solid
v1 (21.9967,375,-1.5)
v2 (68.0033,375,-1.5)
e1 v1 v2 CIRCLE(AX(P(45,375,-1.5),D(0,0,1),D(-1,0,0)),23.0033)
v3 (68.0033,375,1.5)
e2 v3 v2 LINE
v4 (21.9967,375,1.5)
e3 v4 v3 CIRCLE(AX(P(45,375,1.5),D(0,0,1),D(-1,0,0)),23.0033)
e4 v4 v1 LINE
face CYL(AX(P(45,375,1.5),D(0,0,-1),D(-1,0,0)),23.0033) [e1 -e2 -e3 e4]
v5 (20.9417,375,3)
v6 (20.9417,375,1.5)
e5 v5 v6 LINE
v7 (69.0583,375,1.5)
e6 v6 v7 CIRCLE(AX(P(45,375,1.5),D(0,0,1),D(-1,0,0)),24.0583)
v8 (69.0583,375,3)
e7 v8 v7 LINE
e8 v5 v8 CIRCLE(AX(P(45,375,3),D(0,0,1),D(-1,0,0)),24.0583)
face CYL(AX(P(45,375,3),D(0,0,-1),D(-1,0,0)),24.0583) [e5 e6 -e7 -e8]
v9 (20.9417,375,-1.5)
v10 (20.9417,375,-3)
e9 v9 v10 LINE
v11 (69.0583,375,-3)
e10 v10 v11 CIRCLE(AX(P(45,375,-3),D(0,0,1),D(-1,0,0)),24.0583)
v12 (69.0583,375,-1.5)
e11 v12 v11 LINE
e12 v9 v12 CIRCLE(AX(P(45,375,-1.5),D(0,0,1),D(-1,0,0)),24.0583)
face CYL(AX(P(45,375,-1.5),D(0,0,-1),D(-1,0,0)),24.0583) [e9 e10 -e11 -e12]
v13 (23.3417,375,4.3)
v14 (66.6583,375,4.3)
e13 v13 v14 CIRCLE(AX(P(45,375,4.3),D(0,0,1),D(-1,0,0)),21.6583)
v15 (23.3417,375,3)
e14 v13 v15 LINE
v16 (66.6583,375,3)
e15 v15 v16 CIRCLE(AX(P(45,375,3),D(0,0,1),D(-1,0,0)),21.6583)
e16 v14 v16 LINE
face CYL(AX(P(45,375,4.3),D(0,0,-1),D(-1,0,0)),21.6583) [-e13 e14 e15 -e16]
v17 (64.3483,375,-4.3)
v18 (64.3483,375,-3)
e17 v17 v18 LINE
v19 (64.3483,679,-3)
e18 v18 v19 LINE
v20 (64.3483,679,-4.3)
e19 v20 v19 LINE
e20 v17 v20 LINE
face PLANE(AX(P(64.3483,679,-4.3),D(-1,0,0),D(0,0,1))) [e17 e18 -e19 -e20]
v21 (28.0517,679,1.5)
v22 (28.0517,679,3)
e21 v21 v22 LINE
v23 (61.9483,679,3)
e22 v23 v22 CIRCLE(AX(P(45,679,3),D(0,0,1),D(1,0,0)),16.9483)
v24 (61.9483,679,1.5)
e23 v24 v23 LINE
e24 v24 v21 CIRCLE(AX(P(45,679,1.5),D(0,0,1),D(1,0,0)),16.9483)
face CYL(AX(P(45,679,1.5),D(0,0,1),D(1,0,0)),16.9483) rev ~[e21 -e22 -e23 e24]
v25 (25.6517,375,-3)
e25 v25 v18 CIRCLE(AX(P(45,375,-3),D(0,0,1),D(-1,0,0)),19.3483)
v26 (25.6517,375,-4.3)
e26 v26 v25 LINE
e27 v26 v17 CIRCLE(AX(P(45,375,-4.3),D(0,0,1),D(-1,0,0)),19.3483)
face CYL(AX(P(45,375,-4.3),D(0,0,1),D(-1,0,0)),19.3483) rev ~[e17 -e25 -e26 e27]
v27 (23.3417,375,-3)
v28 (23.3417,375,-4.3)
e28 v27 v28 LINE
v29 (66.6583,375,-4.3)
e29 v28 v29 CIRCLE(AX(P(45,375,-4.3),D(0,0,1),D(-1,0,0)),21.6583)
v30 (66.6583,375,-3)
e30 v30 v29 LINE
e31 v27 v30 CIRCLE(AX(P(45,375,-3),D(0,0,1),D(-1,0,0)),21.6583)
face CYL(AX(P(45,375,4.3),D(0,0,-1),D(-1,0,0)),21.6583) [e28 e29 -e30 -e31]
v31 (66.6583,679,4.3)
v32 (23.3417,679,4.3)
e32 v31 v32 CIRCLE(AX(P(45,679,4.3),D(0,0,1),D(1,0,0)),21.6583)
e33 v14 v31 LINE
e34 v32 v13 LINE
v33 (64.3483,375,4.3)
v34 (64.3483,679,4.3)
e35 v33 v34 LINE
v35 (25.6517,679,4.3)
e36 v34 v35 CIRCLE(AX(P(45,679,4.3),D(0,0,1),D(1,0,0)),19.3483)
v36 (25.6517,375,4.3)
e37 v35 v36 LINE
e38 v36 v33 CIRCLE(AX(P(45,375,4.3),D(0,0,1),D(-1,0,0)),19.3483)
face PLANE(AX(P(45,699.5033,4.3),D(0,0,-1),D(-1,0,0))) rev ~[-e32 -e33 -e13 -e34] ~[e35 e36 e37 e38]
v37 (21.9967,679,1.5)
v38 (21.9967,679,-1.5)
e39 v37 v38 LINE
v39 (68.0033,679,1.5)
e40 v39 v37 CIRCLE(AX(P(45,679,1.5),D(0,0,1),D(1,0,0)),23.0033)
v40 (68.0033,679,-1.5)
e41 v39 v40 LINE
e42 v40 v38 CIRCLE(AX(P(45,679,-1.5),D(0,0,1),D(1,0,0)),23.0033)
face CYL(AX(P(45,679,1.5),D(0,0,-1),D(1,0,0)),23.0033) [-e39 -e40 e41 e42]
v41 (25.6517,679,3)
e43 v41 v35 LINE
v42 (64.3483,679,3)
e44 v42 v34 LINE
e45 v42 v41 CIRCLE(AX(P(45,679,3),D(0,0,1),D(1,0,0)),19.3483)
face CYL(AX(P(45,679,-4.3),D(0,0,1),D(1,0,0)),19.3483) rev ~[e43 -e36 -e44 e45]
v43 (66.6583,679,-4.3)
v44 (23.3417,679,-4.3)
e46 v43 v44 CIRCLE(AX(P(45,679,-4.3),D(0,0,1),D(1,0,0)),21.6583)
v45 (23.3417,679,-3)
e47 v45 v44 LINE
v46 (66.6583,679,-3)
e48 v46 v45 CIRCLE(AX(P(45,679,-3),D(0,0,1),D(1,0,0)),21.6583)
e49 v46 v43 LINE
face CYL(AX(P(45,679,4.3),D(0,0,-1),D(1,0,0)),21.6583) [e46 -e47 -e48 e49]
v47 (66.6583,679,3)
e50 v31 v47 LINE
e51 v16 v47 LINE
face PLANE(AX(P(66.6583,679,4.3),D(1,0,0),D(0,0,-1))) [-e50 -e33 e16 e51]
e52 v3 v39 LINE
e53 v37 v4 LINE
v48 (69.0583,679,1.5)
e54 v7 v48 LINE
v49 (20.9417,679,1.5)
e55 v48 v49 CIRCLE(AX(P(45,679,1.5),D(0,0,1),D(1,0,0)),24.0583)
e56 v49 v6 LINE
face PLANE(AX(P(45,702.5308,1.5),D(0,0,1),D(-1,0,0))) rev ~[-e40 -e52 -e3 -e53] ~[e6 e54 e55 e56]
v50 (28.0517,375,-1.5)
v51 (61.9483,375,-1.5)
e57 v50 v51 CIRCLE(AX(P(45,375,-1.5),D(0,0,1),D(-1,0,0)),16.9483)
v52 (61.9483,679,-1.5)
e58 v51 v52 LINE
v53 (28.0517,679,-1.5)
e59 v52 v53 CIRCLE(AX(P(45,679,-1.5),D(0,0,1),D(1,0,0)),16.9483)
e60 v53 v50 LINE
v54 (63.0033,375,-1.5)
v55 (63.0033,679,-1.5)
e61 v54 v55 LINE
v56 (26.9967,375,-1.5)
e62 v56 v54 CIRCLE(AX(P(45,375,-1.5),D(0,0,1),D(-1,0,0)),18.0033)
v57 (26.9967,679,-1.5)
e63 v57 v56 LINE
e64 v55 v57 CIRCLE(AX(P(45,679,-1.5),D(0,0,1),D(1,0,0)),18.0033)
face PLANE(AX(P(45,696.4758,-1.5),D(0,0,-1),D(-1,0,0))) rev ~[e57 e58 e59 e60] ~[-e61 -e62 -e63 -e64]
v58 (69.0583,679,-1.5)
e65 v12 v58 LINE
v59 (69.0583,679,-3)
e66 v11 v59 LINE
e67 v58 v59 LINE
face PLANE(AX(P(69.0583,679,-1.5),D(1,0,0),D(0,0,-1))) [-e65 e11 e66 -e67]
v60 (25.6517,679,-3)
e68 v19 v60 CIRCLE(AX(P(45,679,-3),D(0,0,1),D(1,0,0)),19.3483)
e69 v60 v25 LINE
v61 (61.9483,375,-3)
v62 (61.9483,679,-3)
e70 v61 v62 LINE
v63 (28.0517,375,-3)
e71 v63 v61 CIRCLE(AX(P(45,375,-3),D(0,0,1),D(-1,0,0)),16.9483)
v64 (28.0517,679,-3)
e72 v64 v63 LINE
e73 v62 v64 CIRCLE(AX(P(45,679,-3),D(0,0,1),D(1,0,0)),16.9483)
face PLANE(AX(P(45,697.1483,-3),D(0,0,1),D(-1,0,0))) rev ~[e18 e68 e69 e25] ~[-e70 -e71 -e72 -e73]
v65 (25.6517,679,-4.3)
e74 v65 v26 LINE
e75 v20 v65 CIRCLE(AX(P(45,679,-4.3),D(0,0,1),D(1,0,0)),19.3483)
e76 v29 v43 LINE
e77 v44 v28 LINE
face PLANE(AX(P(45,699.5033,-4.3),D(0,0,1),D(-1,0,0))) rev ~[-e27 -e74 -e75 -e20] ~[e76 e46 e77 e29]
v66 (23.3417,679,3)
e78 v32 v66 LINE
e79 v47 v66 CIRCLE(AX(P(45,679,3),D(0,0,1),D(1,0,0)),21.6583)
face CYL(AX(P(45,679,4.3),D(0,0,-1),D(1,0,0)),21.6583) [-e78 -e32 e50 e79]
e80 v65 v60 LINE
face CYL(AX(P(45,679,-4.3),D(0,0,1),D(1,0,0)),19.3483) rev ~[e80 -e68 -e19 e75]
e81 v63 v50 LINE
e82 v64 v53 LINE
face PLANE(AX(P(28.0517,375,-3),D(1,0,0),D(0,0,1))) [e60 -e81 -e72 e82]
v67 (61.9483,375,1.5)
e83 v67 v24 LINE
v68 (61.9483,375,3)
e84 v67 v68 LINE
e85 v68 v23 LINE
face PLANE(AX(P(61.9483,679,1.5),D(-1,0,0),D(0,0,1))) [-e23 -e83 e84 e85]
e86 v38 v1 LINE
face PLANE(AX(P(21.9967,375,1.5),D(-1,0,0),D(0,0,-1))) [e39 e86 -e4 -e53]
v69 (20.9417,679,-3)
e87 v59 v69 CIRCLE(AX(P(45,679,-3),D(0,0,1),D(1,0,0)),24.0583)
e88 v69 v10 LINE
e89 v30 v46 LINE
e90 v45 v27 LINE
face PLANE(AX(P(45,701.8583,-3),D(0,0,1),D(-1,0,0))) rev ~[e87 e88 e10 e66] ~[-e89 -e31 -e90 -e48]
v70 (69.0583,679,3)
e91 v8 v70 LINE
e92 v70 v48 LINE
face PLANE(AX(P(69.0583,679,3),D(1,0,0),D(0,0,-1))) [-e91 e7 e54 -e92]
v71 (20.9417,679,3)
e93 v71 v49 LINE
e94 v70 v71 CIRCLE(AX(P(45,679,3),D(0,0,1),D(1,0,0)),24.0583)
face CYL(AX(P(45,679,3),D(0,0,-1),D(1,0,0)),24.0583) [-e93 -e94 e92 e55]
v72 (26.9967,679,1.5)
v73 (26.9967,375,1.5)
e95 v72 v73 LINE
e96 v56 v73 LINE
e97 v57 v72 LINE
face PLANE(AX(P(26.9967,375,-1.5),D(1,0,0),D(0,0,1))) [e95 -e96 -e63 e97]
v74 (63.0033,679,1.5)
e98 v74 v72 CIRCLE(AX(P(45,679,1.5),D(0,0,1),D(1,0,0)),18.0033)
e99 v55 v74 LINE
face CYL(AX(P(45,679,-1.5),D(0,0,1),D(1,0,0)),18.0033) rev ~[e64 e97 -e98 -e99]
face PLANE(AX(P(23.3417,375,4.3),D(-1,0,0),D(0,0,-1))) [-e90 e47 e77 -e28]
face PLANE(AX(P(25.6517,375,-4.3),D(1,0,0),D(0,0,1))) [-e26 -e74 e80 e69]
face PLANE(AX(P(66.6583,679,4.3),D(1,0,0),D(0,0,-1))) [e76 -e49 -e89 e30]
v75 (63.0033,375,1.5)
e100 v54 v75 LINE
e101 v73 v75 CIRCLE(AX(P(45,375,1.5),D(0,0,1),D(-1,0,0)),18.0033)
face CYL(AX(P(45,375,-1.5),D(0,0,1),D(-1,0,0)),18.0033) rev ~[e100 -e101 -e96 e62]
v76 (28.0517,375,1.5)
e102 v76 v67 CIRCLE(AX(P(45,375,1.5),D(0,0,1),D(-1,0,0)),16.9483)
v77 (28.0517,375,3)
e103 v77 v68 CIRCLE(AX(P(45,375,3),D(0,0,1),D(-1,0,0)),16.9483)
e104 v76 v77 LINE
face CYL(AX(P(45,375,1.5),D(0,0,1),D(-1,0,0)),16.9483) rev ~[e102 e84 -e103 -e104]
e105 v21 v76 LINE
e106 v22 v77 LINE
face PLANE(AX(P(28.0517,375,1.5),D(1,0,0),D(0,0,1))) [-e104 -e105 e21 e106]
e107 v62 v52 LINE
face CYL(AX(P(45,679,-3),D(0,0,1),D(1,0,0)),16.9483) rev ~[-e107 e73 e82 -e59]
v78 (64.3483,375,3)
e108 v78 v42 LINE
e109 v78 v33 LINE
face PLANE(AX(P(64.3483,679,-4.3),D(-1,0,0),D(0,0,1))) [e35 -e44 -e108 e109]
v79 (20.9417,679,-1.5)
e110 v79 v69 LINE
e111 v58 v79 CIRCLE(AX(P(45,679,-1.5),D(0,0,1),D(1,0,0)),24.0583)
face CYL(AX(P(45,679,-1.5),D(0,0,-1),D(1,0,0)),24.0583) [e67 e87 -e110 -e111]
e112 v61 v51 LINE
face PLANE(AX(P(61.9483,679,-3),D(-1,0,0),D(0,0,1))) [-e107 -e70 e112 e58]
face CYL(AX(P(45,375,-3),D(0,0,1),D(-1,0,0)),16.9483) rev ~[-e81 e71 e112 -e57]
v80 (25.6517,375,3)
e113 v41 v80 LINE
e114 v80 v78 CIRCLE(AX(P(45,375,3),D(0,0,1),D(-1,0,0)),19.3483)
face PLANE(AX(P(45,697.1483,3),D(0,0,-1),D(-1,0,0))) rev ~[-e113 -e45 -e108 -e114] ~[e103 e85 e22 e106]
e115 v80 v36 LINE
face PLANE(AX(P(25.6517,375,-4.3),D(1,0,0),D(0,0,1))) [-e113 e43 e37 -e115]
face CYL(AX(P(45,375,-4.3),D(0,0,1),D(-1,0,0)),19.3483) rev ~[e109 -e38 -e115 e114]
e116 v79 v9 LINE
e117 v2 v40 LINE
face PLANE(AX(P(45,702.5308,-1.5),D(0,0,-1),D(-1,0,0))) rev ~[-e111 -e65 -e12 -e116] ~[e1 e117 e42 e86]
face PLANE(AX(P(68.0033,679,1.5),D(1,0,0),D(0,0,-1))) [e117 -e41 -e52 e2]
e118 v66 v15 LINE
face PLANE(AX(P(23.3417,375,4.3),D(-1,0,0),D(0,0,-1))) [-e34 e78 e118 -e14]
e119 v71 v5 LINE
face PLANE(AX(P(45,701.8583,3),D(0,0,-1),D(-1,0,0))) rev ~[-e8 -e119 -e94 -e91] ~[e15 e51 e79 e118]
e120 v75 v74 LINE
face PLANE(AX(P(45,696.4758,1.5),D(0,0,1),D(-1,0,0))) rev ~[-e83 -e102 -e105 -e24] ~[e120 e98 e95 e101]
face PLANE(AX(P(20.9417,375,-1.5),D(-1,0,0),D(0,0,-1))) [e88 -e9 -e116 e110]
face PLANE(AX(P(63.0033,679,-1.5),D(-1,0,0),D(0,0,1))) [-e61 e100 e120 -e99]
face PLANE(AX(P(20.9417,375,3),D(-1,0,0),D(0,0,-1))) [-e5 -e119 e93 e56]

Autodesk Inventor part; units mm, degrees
ref_plane "Work Plane2" through (45, 375, 0) normal (-1, 0, 0) x (0, 0, 1)
ref_plane "Work Plane3" through (45, 679, 0) normal (0, -1, 0) x (0, 0, 1)
sketch "Path" plane through (0, 0, 0) normal (0, 0, 1) x (1, 0, 0)
  arc A0 (24.4967, 375) -> (65.5033, 375) centre (45, 375) ccw
  arc A1 (65.5033, 679) -> (24.4967, 679) centre (45, 679) ccw
  line L0 (65.5033, 679) -> (65.5033, 375)
  line L1 (24.4967, 375) -> (24.4967, 679)
ref_plane "Section Plane" through (65.5033, 375, 0) normal (0, 1, 0) x (0, 0, 1)
sketch "Section Sketch" plane through (65.5033, 375, 0) normal (0, 1, 0) x (0, 0, 1)
  line L0 (-4.3, -1.155) -> (4.3, -1.155)
  line L1 (4.3, -1.155) -> (4.3, 1.155)
  line L2 (4.3, 1.155) -> (-4.3, 1.155)
  line L3 (-4.3, 1.155) -> (-4.3, -1.155)
  line L4 (-1.5, -2.5) -> (1.5, -2.5)
  line L5 (1.5, -2.5) -> (1.5, 2.5)
  line L6 (1.5, 2.5) -> (-1.5, 2.5)
  line L7 (-1.5, 2.5) -> (-1.5, -2.5)
  line L8 (-1.5, 0) -> (1.5, 0) construction
  line L9 (-3, -3.555) -> (-1.5, -3.555)
  line L10 (-1.5, -3.555) -> (-1.5, 3.555)
  line L11 (-1.5, 3.555) -> (-3, 3.555)
  line L12 (-3, 3.555) -> (-3, -3.555)
  line L13 (1.5, -3.555) -> (3, -3.555)
  line L14 (3, -3.555) -> (3, 3.555)
  line L15 (3, 3.555) -> (1.5, 3.555)
  line L16 (1.5, 3.555) -> (1.5, -3.555)
  line L17 (-4.3, 0) -> (4.3, 0) construction
  point P0 (0, 0)
  point P1 (0, 0)
  dimension "d21" = 2.31
  dimension "d22" = 5
  dimension "d23" = 3
  dimension "d24" = 1.5
  dimension "d31" = 7.11
  dimension "d32" = 8.6
sweep "Solid" add profiles "Section Sketch" path "Path"
pattern_of_one "Strand Pattern"
equation "\"d21\" = da_d2"
equation "\"d22\" = da_d1"
equation "\"d23\" = da_b1"
equation "\"d24\" = da_t1 + da_t2"
equation "\"d30\" = da_pt"
equation "\"da_p\" = 8"
equation "\"da_b1\" = 3"
equation "\"da_h2\" = 7.11"
equation "\"da_h3\" = 7.11"
equation "\"da_d1\" = 5"
equation "\"da_d2\" = 2.31"
equation "\"da_pt\" = 5.64"
equation "\"da_b\" = 8.6"
equation "\"da_t1\" = 0.75"
equation "\"da_t2\" = 0.75"
properties part number "Roller Chain"
